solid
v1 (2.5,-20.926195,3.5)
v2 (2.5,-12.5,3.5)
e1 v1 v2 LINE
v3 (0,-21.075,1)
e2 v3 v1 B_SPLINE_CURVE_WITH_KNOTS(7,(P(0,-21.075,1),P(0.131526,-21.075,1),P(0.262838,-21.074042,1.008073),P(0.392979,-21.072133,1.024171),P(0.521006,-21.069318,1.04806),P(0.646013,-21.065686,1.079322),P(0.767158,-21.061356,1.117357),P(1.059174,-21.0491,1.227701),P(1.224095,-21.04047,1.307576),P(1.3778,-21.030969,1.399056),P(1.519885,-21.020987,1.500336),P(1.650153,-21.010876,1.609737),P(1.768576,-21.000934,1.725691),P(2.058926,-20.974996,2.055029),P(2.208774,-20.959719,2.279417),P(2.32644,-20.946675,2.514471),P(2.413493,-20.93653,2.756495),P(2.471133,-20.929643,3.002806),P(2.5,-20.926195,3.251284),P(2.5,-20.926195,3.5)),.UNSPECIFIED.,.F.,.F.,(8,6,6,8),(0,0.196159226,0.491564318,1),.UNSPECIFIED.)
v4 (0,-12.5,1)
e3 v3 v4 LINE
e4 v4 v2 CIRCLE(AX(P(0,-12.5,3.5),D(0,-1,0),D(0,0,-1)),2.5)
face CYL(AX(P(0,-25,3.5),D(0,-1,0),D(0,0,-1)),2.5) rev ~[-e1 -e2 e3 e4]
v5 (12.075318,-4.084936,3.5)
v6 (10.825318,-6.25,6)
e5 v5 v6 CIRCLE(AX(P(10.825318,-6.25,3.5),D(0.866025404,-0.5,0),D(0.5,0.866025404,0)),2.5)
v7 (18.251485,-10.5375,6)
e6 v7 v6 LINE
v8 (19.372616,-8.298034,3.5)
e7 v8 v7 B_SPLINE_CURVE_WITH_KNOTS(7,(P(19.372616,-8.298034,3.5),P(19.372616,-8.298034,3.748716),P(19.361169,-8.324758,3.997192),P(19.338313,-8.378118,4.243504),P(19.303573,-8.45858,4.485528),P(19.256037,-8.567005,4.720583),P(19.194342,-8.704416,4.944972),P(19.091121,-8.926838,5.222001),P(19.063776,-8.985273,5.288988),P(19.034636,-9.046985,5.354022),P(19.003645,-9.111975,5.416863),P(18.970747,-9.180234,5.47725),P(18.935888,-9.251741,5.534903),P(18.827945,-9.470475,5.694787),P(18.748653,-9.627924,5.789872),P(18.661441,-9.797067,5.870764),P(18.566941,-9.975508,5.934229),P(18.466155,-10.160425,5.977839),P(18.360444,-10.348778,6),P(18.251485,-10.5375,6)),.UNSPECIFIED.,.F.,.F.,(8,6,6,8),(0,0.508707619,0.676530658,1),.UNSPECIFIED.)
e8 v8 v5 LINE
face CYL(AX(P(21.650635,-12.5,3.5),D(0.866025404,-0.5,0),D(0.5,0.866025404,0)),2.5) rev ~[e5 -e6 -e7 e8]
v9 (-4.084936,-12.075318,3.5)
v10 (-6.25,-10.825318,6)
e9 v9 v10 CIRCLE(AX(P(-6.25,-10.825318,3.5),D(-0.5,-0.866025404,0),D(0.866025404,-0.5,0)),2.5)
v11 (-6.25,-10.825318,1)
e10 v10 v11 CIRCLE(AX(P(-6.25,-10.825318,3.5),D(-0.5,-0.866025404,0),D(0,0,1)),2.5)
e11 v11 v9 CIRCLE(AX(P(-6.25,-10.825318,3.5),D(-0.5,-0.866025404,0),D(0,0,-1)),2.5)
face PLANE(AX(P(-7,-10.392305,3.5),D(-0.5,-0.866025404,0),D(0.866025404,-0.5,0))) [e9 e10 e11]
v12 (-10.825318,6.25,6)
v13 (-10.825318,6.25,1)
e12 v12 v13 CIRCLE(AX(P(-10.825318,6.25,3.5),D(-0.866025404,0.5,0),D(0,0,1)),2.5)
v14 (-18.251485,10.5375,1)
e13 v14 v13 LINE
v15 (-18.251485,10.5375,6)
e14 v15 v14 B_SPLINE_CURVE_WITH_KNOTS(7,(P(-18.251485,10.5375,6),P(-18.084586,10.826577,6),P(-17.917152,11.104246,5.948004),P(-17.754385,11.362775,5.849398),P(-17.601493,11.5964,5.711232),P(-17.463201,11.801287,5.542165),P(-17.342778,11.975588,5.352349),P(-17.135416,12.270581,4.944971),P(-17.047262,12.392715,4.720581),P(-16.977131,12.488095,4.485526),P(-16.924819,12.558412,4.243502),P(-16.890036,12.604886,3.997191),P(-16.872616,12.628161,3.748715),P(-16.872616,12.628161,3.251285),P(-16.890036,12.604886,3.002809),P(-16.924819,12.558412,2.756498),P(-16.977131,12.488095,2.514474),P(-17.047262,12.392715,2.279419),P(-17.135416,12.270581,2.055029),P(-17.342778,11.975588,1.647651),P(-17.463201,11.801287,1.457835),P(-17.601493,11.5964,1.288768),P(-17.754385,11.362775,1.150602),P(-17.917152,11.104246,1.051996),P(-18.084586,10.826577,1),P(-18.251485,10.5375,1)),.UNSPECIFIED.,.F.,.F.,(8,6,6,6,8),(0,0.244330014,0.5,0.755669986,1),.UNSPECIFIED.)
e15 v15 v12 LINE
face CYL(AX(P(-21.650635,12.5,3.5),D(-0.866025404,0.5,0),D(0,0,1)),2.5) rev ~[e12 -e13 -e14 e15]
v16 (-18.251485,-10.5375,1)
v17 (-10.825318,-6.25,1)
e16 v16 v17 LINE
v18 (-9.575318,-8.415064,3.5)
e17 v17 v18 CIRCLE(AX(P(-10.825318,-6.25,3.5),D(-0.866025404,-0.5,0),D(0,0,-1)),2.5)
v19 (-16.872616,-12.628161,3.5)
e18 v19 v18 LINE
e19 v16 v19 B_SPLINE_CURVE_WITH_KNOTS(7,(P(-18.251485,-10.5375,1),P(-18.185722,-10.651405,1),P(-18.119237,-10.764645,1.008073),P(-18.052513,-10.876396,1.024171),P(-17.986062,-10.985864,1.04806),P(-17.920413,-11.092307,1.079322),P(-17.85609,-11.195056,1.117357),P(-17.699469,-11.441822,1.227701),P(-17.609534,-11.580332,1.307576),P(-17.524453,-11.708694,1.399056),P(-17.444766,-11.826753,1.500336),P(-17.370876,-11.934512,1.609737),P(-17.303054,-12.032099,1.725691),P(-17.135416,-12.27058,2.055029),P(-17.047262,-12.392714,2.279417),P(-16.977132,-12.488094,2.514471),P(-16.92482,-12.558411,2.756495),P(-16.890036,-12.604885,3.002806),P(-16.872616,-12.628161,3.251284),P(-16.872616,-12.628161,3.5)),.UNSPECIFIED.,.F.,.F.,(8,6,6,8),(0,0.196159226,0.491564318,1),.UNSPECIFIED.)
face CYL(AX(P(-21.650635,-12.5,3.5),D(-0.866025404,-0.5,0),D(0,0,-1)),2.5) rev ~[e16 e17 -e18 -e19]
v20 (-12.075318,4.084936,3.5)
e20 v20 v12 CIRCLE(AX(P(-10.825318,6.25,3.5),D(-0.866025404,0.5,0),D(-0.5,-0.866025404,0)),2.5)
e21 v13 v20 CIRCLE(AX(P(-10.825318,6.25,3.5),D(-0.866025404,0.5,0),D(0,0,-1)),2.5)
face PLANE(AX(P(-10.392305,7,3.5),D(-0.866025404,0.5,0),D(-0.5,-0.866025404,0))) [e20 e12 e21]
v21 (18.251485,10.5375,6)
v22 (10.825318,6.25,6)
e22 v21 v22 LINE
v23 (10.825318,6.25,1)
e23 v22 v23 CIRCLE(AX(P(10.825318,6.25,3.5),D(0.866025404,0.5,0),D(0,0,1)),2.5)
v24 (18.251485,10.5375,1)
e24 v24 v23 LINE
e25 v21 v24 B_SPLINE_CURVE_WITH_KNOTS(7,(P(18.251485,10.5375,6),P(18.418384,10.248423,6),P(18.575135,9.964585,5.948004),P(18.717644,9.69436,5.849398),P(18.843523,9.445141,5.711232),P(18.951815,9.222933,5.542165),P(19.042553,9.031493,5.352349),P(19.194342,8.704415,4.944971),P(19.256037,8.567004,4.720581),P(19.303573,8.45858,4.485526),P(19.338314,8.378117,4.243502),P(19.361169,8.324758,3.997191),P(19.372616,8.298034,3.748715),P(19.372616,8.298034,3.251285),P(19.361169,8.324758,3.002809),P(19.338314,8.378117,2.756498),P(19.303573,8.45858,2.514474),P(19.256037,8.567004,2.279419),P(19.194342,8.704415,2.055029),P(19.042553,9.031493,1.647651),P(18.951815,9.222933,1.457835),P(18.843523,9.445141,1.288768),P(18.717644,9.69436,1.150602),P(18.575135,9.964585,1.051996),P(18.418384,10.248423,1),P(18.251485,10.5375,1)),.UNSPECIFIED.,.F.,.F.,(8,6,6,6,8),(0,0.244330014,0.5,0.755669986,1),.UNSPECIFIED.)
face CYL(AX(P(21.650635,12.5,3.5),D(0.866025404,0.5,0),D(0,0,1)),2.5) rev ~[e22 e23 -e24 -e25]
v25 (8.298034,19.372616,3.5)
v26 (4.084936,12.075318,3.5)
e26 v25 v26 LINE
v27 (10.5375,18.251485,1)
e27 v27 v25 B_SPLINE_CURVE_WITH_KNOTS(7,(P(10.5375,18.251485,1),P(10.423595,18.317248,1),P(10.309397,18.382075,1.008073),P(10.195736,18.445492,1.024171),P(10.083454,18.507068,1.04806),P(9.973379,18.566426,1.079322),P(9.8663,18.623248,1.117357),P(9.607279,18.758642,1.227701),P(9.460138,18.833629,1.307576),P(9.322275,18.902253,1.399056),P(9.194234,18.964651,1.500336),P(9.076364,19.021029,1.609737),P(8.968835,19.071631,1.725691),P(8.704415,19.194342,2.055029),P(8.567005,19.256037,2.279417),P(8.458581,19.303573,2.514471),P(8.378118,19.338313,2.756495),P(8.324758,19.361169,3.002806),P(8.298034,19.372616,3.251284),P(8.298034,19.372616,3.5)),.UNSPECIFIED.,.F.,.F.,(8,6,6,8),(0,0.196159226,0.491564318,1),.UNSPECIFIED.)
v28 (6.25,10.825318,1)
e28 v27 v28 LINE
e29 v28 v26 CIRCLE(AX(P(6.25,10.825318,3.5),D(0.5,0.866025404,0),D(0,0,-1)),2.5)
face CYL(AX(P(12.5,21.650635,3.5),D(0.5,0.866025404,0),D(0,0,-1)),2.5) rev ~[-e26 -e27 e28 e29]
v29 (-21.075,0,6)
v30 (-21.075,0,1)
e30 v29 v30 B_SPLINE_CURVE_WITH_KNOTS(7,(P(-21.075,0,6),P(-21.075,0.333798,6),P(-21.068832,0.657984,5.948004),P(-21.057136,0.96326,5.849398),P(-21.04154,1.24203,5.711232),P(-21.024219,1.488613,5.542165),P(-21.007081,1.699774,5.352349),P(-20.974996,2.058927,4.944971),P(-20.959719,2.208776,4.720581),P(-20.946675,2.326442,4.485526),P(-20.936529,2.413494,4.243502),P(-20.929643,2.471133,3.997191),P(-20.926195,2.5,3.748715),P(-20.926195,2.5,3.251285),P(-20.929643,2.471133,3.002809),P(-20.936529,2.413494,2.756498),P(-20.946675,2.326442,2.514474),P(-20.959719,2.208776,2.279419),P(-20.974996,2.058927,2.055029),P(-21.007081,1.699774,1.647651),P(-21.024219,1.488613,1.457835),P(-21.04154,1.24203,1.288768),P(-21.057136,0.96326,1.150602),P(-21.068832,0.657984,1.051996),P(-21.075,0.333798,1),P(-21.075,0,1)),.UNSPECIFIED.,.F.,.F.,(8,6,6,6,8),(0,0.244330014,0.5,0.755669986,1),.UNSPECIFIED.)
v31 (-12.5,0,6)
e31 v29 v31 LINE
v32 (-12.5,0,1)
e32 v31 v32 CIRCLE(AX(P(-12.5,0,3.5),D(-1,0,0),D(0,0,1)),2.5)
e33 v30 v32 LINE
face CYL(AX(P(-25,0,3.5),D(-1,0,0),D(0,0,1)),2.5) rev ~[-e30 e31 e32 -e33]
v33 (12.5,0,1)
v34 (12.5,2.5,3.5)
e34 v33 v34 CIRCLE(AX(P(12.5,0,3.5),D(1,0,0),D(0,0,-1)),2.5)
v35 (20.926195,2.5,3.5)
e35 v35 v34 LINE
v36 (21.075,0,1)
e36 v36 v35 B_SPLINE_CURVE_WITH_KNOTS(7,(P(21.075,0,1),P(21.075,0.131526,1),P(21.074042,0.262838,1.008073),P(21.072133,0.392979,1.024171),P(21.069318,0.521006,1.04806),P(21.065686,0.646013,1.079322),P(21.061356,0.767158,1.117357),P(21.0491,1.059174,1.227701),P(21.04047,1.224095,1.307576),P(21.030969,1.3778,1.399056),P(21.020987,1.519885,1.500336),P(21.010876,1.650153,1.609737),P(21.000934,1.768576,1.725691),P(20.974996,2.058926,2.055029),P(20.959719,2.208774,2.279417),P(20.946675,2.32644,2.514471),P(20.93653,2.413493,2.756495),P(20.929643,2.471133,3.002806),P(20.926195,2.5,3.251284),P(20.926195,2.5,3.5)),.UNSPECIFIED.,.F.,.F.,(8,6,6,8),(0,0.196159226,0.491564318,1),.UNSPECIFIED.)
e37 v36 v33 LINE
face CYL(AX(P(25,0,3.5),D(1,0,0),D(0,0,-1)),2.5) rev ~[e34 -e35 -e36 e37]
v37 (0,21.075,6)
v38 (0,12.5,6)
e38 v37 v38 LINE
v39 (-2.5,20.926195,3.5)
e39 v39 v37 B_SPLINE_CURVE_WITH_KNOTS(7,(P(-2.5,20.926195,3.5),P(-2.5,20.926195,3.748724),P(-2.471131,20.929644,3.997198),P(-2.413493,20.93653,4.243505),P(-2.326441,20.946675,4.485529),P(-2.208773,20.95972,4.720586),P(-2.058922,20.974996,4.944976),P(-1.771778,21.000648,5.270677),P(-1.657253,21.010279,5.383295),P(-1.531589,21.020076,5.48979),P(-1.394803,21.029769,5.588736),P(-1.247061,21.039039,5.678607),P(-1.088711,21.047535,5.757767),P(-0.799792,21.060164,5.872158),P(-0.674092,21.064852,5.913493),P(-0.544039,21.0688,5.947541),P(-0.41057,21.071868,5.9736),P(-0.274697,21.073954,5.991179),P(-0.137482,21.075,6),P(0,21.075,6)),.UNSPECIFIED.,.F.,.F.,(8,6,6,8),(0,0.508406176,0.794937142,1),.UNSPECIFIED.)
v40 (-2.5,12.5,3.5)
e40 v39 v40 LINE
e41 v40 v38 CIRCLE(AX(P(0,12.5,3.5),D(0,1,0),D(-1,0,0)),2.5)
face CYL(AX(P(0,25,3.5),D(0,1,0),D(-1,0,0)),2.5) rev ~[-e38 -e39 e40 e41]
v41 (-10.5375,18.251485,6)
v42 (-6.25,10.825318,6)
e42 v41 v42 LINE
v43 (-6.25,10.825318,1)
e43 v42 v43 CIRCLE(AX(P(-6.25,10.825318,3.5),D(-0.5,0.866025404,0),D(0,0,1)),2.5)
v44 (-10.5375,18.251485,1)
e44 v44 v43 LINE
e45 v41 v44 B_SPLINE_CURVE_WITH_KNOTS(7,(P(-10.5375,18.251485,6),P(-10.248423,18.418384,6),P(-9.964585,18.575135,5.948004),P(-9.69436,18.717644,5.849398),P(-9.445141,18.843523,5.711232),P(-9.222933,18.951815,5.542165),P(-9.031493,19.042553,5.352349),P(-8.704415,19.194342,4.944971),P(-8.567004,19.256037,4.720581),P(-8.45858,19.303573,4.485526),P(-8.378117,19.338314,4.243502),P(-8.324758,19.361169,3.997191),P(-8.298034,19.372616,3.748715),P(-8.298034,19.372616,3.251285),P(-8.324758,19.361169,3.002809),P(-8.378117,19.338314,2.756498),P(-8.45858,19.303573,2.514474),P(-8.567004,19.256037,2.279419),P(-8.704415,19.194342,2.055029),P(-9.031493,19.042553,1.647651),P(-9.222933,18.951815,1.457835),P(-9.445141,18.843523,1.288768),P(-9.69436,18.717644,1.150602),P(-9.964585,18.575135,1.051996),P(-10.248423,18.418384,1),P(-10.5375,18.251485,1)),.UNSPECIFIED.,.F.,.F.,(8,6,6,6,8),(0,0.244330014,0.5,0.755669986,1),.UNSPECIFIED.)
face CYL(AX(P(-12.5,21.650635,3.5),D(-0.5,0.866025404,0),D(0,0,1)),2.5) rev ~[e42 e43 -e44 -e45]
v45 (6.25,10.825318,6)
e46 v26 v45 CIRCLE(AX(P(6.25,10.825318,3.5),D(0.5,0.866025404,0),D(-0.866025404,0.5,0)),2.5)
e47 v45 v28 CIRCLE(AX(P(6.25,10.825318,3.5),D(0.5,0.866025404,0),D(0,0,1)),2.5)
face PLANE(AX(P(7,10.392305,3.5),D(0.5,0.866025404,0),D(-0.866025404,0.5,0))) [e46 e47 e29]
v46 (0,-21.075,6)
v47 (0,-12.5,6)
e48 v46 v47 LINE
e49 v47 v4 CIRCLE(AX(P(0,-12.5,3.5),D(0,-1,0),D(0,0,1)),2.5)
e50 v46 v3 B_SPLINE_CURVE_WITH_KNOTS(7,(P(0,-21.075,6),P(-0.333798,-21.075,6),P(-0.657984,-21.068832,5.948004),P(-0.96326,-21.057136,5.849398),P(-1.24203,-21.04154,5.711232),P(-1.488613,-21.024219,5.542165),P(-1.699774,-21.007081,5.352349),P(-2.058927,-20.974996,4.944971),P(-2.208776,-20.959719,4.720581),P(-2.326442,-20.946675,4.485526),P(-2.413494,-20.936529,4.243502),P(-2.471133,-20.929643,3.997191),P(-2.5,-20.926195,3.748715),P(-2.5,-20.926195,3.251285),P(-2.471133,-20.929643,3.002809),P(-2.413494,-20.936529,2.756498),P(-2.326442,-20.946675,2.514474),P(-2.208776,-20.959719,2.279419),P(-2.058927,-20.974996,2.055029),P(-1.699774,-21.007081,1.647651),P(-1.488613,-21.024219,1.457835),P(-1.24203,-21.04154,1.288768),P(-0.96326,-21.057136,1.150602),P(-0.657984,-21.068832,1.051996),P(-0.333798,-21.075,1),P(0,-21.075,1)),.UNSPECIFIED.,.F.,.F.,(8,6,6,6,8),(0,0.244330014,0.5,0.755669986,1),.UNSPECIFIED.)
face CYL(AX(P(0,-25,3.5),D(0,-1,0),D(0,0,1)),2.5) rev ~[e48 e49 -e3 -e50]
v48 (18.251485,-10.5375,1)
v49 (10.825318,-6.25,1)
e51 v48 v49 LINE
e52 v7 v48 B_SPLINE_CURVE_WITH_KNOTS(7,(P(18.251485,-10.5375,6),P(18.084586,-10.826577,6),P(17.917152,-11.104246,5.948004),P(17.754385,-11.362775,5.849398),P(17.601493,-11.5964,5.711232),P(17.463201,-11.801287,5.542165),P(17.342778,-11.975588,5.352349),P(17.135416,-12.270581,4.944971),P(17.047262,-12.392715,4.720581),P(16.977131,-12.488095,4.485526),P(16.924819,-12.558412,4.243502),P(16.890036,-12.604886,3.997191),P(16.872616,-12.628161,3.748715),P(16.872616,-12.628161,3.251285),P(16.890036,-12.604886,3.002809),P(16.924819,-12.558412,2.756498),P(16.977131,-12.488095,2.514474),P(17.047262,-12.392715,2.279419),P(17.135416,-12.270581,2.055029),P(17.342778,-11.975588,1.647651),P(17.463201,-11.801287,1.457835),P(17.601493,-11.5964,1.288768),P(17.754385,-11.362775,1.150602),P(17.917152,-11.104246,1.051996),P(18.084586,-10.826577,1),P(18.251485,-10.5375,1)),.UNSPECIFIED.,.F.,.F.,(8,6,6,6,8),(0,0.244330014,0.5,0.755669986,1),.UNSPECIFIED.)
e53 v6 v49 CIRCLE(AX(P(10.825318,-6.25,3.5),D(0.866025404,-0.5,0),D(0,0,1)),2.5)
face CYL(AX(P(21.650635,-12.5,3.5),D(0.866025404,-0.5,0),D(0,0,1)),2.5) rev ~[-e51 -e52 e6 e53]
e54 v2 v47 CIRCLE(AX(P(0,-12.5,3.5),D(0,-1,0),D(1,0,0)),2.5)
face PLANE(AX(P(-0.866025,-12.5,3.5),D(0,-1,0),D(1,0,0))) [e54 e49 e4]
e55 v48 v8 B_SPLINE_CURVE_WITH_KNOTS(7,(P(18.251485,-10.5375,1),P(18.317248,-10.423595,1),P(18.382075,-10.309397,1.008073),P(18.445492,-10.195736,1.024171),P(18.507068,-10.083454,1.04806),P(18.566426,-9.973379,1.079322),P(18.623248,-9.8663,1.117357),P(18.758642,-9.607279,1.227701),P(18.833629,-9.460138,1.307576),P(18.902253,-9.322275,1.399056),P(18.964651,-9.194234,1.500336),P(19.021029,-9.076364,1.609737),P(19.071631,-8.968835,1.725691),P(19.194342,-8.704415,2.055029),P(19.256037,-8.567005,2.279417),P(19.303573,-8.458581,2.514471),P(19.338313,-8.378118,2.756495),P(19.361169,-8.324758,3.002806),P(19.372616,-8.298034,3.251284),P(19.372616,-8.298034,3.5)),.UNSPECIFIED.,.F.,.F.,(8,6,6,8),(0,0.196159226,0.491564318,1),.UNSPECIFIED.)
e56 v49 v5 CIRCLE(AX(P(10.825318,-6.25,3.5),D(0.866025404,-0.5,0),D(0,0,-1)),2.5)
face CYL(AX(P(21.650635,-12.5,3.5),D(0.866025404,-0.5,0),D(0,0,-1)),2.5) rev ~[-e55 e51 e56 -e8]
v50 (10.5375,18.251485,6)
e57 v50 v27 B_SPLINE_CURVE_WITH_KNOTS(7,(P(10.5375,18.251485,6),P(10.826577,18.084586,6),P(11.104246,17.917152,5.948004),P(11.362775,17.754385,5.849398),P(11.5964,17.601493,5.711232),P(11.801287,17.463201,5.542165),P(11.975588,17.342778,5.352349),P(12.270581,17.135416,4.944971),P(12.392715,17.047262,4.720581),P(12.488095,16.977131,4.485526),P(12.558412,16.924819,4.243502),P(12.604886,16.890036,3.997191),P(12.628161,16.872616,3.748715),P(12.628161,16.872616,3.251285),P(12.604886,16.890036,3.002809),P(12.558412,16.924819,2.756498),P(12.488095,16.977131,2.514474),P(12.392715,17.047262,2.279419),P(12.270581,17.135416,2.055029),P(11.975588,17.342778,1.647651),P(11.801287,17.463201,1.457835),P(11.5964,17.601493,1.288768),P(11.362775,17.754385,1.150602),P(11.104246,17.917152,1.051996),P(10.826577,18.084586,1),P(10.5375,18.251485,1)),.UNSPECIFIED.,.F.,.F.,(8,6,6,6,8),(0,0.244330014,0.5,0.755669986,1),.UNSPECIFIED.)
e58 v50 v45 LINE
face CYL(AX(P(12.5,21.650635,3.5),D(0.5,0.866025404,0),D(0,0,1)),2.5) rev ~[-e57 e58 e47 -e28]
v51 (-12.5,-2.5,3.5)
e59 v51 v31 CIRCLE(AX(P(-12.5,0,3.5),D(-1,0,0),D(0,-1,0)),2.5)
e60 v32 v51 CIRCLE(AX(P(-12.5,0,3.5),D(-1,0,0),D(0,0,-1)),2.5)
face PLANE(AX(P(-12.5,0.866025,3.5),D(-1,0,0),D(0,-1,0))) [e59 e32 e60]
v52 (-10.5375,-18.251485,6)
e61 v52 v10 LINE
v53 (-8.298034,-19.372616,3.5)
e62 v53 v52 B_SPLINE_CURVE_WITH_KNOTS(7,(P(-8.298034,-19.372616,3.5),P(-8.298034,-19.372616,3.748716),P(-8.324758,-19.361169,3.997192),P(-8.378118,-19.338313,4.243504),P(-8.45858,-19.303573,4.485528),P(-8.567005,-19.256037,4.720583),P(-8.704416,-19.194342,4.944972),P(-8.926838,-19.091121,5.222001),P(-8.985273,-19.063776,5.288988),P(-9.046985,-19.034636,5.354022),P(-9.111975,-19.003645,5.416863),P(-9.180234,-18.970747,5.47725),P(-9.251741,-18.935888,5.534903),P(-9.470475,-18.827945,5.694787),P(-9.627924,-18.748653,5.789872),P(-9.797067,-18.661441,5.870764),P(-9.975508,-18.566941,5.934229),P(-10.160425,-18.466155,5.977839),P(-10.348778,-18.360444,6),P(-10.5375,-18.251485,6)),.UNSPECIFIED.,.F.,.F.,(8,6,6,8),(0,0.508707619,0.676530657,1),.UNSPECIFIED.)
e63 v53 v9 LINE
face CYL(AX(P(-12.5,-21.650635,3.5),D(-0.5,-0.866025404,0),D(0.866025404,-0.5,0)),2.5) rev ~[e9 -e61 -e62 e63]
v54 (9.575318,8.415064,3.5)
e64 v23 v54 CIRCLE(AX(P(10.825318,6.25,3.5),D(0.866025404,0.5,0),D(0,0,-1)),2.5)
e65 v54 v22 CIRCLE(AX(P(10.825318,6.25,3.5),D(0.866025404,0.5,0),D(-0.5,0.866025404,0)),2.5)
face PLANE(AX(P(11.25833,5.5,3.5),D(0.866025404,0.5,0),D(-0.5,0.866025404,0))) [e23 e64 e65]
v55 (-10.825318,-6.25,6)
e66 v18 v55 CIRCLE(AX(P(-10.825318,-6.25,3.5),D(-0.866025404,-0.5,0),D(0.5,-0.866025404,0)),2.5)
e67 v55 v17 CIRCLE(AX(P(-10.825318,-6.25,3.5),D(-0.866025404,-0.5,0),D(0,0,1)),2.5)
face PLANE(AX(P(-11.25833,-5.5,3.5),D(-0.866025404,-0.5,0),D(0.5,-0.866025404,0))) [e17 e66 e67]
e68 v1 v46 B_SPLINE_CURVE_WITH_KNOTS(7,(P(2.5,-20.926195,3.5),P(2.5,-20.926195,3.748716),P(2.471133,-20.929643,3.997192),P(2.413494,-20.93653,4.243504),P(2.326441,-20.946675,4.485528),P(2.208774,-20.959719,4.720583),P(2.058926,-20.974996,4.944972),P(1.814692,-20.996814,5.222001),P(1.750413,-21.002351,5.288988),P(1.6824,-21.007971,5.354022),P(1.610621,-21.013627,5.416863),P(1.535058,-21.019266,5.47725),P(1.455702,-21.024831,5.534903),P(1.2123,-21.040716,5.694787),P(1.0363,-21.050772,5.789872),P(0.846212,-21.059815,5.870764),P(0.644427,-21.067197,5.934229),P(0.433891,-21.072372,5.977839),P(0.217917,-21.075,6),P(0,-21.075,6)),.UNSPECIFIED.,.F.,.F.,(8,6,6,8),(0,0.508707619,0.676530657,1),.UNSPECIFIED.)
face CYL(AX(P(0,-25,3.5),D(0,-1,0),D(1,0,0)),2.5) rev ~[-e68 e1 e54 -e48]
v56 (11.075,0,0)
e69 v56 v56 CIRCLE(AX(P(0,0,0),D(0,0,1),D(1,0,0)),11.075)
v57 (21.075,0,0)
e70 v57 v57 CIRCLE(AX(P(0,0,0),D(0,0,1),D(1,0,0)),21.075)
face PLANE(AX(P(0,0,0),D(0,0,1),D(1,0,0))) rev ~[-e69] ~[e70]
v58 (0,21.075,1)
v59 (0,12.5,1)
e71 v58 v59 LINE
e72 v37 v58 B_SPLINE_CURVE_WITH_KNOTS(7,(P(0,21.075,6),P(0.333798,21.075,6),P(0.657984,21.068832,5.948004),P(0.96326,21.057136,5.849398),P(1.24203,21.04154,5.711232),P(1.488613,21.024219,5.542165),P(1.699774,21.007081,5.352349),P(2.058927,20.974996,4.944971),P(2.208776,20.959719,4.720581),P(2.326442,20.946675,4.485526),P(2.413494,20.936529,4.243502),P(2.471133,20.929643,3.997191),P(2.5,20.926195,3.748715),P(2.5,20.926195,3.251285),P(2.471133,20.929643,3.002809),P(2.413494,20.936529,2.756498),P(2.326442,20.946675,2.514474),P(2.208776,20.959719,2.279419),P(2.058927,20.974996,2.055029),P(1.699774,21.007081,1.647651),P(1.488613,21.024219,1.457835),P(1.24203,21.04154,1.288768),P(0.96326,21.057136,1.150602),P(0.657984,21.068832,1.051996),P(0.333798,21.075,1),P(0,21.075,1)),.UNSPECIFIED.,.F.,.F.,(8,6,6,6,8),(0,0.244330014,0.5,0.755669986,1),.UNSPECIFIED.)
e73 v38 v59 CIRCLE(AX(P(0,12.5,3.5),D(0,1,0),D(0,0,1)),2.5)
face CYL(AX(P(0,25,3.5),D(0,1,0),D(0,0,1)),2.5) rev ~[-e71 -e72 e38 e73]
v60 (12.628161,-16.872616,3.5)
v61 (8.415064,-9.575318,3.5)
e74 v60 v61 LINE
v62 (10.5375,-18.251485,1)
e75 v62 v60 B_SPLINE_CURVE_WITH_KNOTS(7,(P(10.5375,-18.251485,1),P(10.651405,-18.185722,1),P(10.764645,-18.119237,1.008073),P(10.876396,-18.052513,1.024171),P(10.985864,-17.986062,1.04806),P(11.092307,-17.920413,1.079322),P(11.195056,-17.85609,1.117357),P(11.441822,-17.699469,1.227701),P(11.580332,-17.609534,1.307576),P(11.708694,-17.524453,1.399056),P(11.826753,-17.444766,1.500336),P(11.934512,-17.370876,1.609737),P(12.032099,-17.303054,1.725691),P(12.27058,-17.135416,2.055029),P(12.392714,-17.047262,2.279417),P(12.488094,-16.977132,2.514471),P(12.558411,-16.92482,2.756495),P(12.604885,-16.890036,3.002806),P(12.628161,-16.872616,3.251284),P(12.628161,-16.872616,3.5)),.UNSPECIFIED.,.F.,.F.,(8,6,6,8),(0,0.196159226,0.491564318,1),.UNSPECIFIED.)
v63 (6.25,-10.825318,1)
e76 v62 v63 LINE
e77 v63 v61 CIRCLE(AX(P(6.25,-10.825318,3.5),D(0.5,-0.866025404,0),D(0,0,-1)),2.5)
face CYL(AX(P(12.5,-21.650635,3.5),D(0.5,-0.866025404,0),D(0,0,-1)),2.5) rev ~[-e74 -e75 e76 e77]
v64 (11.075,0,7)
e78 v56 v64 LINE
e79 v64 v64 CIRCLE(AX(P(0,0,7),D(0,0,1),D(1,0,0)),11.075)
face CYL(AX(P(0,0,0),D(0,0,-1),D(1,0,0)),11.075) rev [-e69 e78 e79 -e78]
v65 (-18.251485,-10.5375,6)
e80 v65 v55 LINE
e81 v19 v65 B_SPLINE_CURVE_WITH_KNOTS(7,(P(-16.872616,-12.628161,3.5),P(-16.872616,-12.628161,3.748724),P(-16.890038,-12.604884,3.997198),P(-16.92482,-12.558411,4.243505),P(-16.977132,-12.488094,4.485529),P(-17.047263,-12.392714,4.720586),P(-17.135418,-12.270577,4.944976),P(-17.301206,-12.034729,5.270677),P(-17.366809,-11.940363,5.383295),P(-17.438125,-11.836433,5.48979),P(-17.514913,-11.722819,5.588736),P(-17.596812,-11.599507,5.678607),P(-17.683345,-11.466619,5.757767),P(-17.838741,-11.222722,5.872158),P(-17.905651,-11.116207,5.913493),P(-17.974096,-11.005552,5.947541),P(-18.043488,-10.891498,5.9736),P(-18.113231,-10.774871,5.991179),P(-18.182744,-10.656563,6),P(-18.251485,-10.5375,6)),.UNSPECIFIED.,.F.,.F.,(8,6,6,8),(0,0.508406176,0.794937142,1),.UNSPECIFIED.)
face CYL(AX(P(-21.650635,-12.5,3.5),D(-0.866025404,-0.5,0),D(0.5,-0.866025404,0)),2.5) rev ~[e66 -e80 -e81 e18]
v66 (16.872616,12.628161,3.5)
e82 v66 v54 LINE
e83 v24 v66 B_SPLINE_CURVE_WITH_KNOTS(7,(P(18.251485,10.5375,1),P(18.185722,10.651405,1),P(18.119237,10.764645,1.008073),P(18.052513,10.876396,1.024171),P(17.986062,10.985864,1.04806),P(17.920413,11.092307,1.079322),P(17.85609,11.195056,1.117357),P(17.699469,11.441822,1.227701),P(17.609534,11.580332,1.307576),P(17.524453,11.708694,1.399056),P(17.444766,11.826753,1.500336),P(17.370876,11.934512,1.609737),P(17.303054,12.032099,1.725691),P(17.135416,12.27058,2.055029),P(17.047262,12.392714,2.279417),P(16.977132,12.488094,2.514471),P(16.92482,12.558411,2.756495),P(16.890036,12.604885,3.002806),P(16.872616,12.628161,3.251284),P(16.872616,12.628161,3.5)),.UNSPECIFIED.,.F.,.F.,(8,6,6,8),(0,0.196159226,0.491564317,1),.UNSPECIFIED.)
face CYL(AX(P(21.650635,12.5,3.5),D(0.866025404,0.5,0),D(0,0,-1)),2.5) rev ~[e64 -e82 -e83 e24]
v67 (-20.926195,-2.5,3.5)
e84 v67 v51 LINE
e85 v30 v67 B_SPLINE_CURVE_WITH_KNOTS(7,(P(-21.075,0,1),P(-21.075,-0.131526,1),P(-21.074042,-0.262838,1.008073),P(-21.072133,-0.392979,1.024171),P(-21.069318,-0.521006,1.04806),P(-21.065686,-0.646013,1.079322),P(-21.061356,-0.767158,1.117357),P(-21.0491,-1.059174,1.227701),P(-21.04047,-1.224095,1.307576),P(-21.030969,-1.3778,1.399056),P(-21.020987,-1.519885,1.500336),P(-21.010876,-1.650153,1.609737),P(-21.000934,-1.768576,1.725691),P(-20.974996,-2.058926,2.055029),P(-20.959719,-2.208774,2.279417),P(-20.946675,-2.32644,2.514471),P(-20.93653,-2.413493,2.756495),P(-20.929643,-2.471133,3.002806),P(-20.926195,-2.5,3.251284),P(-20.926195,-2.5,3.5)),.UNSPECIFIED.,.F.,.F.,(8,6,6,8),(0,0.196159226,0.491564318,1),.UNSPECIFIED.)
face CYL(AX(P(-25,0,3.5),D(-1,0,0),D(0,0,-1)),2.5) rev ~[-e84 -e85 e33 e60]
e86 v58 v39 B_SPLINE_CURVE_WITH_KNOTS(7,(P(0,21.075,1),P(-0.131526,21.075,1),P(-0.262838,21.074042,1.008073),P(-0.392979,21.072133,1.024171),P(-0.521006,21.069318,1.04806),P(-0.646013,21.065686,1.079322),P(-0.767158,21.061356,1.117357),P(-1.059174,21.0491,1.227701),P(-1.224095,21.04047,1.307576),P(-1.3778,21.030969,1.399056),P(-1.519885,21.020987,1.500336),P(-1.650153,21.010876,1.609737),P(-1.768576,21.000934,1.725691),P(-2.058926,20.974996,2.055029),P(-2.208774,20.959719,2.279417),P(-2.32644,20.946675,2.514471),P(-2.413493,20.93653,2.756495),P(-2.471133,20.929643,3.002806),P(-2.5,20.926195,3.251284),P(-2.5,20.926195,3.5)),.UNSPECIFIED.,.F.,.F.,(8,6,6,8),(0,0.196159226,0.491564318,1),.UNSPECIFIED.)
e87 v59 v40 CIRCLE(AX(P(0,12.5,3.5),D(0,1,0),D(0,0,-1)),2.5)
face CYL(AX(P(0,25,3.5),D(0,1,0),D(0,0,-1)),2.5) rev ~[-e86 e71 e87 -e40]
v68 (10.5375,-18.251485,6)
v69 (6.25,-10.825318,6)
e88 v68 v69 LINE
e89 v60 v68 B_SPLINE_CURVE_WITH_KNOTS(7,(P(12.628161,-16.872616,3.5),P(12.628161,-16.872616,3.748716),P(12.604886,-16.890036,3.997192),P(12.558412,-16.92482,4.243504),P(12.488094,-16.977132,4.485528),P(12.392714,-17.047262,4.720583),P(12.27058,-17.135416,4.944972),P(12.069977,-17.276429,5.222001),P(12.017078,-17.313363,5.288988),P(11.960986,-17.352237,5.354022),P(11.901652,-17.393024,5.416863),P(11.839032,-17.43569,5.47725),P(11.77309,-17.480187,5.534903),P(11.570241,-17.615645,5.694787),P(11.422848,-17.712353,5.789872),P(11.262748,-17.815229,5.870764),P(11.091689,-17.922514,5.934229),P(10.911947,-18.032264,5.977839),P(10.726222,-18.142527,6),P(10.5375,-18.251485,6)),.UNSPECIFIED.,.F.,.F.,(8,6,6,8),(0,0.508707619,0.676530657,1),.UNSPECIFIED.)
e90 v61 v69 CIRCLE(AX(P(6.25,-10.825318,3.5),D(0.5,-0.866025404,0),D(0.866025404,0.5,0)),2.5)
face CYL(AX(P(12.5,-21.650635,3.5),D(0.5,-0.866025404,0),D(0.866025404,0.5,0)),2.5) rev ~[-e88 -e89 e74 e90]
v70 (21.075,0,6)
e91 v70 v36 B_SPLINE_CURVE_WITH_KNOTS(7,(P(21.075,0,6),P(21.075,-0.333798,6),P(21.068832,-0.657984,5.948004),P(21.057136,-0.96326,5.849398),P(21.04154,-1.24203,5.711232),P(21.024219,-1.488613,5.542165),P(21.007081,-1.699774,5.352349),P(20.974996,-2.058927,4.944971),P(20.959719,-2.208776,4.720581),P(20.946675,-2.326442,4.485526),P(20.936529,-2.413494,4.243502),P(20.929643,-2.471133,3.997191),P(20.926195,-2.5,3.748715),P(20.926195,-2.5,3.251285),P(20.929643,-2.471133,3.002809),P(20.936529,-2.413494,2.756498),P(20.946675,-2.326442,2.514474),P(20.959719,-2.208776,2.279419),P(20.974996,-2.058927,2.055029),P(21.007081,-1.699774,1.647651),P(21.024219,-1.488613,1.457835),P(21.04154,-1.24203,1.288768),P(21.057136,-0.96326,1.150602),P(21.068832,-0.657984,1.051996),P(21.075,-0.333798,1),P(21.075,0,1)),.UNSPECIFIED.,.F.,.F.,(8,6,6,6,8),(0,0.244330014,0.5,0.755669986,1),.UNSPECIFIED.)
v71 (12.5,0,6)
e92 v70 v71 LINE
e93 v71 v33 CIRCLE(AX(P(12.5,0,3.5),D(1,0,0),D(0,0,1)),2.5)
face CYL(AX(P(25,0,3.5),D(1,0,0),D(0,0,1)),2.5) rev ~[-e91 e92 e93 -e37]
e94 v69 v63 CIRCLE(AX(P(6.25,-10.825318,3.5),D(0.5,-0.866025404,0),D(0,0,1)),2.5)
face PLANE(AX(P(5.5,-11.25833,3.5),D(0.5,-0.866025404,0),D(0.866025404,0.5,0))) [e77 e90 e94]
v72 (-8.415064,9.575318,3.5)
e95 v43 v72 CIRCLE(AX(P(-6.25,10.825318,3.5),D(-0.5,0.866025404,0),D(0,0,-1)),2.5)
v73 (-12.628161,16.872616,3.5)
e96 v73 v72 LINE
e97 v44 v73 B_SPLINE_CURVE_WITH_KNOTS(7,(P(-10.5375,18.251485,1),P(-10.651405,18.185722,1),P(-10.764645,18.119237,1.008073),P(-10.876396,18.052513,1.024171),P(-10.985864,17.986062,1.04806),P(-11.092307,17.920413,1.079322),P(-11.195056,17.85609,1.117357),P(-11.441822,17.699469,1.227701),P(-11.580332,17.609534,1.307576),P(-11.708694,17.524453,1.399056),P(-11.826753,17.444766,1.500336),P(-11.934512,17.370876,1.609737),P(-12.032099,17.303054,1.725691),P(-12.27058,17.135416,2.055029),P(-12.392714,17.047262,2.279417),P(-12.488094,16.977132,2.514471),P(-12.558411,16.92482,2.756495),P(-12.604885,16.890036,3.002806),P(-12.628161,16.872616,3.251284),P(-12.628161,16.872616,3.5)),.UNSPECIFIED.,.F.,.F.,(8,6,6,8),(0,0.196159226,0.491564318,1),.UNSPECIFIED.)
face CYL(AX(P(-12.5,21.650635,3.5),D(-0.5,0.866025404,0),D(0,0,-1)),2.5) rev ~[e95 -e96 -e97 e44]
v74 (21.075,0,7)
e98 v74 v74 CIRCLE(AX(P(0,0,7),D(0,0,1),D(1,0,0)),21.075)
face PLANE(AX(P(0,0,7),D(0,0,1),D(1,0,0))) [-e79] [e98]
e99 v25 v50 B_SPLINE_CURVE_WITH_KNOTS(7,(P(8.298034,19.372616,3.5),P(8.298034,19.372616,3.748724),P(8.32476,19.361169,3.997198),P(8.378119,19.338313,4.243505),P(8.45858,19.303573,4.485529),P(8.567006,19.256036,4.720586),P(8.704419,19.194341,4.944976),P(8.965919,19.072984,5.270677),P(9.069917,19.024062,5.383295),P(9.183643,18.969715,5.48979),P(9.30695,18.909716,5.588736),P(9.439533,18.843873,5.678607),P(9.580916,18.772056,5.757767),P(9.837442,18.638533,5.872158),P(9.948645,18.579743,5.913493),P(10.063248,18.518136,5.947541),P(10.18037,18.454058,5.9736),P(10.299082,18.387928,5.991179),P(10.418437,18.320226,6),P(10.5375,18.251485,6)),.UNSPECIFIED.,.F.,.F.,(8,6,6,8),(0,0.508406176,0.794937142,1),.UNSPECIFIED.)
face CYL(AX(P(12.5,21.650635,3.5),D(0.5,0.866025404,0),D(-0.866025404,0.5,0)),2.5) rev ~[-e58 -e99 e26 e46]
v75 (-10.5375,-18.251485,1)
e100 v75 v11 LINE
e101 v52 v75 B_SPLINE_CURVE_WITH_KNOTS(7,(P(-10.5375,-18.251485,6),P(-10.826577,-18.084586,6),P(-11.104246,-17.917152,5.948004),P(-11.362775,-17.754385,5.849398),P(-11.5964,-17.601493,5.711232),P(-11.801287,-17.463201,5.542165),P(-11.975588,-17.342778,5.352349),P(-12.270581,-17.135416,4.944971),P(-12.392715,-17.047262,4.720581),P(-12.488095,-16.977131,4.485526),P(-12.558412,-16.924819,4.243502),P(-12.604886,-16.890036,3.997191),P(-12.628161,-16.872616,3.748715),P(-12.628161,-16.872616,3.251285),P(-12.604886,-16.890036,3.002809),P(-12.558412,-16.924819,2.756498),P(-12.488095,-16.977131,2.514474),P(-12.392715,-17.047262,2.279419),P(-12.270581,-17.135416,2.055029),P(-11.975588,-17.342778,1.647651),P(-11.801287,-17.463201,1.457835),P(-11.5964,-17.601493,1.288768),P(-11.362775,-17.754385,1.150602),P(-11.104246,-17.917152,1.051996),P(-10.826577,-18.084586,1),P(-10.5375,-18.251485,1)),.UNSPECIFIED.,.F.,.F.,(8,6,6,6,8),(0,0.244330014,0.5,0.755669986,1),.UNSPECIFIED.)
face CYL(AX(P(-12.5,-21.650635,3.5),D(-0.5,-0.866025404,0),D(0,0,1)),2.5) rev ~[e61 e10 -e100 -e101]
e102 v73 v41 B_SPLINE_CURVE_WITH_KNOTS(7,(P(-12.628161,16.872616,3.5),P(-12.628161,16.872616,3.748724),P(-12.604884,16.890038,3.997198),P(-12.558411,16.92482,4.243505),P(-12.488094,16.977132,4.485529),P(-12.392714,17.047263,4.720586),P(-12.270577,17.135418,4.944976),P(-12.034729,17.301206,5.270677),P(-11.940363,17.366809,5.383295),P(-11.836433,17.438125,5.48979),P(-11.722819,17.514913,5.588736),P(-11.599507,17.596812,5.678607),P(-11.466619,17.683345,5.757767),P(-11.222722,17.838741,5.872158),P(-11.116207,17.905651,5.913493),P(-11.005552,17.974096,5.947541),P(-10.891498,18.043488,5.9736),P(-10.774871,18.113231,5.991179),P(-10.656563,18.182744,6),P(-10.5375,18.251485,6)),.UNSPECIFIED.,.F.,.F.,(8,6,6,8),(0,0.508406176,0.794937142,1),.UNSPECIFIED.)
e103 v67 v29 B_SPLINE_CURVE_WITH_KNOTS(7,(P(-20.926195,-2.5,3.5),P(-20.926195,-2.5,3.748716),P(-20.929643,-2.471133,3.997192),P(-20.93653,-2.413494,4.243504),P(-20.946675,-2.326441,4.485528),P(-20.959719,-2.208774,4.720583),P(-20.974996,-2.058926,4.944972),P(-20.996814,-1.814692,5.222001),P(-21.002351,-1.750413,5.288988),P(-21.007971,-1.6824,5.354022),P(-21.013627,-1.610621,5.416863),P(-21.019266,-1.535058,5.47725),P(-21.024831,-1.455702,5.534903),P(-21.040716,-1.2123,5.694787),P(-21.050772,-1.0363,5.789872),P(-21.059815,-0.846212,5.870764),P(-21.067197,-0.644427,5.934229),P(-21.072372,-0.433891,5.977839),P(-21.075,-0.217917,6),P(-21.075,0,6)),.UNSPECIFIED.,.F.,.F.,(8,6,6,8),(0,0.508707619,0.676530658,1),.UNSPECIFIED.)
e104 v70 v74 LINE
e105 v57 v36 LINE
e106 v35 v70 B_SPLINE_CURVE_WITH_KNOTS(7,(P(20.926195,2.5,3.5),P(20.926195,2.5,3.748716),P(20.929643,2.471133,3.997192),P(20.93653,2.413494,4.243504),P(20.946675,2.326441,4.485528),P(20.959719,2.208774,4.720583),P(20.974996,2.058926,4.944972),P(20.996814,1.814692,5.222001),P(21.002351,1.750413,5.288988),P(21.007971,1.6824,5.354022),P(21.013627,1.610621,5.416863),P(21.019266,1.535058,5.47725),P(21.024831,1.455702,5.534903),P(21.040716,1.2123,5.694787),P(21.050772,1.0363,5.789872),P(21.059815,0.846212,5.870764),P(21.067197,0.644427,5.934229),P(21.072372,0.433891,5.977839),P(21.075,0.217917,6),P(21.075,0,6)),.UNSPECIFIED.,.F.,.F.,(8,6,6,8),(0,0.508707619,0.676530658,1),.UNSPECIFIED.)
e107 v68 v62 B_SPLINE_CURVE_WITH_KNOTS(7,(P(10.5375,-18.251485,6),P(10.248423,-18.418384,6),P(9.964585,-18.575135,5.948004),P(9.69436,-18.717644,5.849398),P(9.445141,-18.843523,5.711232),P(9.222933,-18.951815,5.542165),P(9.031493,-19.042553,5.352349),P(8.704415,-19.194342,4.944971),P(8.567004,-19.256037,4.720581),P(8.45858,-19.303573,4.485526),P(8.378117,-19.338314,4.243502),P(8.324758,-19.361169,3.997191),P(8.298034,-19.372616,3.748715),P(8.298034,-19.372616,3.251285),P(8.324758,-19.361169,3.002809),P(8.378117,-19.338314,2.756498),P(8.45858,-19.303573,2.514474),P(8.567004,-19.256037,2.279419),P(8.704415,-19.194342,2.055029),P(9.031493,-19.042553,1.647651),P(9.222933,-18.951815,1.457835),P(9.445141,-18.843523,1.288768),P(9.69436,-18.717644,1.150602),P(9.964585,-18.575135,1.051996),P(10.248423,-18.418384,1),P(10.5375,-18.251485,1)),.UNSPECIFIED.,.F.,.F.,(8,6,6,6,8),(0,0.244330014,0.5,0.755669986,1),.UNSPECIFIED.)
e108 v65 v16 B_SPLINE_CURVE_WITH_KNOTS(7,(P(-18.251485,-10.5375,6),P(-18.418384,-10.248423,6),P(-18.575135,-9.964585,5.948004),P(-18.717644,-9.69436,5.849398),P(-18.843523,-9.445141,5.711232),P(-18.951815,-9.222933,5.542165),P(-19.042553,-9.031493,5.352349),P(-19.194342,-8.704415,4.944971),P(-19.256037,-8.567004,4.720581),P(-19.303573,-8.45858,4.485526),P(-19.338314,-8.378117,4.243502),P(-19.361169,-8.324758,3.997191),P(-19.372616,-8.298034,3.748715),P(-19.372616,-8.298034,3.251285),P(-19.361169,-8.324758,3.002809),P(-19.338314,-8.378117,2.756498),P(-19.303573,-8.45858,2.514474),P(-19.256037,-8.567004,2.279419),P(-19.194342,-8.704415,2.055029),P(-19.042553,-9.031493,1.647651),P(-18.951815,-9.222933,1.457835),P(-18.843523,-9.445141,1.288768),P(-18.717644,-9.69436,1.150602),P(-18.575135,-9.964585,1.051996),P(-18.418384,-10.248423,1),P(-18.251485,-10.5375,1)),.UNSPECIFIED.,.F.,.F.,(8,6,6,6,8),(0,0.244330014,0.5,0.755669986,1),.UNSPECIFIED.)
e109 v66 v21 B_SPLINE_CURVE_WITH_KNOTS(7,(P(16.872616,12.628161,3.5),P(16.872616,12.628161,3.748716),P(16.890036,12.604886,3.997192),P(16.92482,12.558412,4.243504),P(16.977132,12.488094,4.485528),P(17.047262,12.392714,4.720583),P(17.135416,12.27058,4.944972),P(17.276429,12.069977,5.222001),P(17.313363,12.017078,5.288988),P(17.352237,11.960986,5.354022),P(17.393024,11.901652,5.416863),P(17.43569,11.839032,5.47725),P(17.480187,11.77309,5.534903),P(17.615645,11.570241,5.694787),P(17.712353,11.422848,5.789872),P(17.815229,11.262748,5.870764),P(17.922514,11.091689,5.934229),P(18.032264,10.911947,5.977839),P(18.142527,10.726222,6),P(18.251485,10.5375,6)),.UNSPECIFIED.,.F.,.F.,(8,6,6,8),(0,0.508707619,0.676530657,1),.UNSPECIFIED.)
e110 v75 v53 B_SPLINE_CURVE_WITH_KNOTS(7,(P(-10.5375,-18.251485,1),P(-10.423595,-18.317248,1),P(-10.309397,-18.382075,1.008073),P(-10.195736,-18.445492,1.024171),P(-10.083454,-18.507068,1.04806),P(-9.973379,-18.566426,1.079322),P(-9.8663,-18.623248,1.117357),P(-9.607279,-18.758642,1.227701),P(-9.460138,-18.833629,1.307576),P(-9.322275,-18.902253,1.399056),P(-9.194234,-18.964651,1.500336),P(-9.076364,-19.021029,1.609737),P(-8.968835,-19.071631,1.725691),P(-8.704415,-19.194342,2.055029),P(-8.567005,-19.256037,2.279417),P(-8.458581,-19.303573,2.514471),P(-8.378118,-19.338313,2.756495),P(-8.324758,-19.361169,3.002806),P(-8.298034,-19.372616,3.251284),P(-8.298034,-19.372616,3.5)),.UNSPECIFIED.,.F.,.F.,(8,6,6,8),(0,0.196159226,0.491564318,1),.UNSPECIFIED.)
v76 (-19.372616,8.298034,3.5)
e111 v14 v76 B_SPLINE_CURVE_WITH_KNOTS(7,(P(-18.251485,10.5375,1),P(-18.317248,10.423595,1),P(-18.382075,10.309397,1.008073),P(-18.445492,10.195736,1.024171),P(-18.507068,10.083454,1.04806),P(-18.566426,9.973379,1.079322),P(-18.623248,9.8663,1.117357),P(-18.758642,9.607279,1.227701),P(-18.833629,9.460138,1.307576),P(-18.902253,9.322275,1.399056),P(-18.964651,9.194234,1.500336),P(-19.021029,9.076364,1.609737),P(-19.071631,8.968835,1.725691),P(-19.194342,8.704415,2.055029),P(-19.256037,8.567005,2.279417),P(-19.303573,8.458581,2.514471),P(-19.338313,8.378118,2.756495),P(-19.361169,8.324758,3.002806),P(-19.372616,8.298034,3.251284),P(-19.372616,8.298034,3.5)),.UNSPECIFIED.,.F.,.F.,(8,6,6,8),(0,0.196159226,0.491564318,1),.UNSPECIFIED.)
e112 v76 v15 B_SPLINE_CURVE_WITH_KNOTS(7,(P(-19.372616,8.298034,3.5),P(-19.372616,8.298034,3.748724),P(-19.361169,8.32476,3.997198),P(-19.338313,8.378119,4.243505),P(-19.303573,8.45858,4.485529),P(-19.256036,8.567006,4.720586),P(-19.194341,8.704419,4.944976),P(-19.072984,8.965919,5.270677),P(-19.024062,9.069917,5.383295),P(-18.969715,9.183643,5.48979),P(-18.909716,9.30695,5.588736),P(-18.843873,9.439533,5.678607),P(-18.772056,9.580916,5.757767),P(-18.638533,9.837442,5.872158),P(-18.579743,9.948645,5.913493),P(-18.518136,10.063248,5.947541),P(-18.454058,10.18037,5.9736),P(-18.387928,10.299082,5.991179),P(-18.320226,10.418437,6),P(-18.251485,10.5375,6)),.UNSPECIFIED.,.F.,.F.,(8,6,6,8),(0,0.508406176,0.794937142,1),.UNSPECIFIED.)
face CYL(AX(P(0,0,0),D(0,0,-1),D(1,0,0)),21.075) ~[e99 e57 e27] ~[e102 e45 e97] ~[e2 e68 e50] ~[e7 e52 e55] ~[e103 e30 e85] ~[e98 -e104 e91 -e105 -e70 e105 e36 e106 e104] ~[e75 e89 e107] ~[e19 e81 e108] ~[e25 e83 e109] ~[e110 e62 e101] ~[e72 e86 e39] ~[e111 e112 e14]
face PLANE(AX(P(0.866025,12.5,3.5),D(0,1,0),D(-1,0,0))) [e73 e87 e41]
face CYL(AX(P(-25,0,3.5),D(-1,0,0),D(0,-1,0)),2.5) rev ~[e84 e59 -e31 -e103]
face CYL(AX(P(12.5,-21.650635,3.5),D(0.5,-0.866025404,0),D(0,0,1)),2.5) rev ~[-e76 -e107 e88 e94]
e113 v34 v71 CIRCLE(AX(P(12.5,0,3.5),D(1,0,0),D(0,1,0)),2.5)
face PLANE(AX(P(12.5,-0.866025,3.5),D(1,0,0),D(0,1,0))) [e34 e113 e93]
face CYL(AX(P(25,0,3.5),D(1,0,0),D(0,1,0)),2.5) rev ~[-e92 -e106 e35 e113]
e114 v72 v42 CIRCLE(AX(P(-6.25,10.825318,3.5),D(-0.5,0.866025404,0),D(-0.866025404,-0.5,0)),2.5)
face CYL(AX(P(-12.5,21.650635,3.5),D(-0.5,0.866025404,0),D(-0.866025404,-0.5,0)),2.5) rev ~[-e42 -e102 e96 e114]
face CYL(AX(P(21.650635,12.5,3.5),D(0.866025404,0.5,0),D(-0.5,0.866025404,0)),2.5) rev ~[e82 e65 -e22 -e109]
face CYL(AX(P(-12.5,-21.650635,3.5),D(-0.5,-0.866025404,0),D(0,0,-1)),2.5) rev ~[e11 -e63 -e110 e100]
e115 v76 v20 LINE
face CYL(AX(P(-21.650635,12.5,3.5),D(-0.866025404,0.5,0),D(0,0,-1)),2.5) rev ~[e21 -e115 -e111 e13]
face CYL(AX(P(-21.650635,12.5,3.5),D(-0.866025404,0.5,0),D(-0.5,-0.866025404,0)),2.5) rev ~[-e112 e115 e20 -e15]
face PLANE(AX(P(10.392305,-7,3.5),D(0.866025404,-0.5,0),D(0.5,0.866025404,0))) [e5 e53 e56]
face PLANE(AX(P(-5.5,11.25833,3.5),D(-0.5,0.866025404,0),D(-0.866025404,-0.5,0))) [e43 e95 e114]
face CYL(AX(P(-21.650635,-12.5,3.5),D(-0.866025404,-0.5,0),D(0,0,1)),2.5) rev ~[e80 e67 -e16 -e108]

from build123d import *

# Parameters (mm, degrees)
F0_R            = 21.075
F0_R_2          = 11.075
F1_DEPTH        = 7
F4_DEPTH        = 12.5
F4_COPIES_COUNT = 12


# Not quite as in the source:
# - a pattern or mirror of a feature is missing from the dataset's text; its kind, count and spacing are read off the source's solid


with BuildPart() as f1:
    # F0 (on Top) → F1 (new body)
    with BuildSketch(Plane.XY):
        Circle(F0_R)
        Circle(F0_R_2, mode=Mode.SUBTRACT)
    extrude(amount=F1_DEPTH)

    # F3 (on offset) → F4 (cut)
    with BuildSketch(Plane.XZ.offset(25)):
        with BuildLine():
            Line((0, 1), (0, 6))
            ThreePointArc((0, 6), (-2.5, 3.5), (0, 1))
        make_face()
        with BuildLine():
            ThreePointArc((0, 1), (1.767766953, 1.732233047), (2.5, 3.5))
            ThreePointArc((2.5, 3.5), (1.767766953, 5.267766953), (0, 6))
            Line((0, 6), (0, 1))
        make_face()
    f4 = extrude(amount=-F4_DEPTH, mode=Mode.SUBTRACT)

    # F4_copies: F4 ×12 about axis
    f4_copies_axis = Axis((0, 0, 0), (0, 0, 1))
    for i in range(1, F4_COPIES_COUNT):
        add(f4.rotate(f4_copies_axis, i * 360 / F4_COPIES_COUNT), mode=Mode.SUBTRACT)


solid = f1.part
